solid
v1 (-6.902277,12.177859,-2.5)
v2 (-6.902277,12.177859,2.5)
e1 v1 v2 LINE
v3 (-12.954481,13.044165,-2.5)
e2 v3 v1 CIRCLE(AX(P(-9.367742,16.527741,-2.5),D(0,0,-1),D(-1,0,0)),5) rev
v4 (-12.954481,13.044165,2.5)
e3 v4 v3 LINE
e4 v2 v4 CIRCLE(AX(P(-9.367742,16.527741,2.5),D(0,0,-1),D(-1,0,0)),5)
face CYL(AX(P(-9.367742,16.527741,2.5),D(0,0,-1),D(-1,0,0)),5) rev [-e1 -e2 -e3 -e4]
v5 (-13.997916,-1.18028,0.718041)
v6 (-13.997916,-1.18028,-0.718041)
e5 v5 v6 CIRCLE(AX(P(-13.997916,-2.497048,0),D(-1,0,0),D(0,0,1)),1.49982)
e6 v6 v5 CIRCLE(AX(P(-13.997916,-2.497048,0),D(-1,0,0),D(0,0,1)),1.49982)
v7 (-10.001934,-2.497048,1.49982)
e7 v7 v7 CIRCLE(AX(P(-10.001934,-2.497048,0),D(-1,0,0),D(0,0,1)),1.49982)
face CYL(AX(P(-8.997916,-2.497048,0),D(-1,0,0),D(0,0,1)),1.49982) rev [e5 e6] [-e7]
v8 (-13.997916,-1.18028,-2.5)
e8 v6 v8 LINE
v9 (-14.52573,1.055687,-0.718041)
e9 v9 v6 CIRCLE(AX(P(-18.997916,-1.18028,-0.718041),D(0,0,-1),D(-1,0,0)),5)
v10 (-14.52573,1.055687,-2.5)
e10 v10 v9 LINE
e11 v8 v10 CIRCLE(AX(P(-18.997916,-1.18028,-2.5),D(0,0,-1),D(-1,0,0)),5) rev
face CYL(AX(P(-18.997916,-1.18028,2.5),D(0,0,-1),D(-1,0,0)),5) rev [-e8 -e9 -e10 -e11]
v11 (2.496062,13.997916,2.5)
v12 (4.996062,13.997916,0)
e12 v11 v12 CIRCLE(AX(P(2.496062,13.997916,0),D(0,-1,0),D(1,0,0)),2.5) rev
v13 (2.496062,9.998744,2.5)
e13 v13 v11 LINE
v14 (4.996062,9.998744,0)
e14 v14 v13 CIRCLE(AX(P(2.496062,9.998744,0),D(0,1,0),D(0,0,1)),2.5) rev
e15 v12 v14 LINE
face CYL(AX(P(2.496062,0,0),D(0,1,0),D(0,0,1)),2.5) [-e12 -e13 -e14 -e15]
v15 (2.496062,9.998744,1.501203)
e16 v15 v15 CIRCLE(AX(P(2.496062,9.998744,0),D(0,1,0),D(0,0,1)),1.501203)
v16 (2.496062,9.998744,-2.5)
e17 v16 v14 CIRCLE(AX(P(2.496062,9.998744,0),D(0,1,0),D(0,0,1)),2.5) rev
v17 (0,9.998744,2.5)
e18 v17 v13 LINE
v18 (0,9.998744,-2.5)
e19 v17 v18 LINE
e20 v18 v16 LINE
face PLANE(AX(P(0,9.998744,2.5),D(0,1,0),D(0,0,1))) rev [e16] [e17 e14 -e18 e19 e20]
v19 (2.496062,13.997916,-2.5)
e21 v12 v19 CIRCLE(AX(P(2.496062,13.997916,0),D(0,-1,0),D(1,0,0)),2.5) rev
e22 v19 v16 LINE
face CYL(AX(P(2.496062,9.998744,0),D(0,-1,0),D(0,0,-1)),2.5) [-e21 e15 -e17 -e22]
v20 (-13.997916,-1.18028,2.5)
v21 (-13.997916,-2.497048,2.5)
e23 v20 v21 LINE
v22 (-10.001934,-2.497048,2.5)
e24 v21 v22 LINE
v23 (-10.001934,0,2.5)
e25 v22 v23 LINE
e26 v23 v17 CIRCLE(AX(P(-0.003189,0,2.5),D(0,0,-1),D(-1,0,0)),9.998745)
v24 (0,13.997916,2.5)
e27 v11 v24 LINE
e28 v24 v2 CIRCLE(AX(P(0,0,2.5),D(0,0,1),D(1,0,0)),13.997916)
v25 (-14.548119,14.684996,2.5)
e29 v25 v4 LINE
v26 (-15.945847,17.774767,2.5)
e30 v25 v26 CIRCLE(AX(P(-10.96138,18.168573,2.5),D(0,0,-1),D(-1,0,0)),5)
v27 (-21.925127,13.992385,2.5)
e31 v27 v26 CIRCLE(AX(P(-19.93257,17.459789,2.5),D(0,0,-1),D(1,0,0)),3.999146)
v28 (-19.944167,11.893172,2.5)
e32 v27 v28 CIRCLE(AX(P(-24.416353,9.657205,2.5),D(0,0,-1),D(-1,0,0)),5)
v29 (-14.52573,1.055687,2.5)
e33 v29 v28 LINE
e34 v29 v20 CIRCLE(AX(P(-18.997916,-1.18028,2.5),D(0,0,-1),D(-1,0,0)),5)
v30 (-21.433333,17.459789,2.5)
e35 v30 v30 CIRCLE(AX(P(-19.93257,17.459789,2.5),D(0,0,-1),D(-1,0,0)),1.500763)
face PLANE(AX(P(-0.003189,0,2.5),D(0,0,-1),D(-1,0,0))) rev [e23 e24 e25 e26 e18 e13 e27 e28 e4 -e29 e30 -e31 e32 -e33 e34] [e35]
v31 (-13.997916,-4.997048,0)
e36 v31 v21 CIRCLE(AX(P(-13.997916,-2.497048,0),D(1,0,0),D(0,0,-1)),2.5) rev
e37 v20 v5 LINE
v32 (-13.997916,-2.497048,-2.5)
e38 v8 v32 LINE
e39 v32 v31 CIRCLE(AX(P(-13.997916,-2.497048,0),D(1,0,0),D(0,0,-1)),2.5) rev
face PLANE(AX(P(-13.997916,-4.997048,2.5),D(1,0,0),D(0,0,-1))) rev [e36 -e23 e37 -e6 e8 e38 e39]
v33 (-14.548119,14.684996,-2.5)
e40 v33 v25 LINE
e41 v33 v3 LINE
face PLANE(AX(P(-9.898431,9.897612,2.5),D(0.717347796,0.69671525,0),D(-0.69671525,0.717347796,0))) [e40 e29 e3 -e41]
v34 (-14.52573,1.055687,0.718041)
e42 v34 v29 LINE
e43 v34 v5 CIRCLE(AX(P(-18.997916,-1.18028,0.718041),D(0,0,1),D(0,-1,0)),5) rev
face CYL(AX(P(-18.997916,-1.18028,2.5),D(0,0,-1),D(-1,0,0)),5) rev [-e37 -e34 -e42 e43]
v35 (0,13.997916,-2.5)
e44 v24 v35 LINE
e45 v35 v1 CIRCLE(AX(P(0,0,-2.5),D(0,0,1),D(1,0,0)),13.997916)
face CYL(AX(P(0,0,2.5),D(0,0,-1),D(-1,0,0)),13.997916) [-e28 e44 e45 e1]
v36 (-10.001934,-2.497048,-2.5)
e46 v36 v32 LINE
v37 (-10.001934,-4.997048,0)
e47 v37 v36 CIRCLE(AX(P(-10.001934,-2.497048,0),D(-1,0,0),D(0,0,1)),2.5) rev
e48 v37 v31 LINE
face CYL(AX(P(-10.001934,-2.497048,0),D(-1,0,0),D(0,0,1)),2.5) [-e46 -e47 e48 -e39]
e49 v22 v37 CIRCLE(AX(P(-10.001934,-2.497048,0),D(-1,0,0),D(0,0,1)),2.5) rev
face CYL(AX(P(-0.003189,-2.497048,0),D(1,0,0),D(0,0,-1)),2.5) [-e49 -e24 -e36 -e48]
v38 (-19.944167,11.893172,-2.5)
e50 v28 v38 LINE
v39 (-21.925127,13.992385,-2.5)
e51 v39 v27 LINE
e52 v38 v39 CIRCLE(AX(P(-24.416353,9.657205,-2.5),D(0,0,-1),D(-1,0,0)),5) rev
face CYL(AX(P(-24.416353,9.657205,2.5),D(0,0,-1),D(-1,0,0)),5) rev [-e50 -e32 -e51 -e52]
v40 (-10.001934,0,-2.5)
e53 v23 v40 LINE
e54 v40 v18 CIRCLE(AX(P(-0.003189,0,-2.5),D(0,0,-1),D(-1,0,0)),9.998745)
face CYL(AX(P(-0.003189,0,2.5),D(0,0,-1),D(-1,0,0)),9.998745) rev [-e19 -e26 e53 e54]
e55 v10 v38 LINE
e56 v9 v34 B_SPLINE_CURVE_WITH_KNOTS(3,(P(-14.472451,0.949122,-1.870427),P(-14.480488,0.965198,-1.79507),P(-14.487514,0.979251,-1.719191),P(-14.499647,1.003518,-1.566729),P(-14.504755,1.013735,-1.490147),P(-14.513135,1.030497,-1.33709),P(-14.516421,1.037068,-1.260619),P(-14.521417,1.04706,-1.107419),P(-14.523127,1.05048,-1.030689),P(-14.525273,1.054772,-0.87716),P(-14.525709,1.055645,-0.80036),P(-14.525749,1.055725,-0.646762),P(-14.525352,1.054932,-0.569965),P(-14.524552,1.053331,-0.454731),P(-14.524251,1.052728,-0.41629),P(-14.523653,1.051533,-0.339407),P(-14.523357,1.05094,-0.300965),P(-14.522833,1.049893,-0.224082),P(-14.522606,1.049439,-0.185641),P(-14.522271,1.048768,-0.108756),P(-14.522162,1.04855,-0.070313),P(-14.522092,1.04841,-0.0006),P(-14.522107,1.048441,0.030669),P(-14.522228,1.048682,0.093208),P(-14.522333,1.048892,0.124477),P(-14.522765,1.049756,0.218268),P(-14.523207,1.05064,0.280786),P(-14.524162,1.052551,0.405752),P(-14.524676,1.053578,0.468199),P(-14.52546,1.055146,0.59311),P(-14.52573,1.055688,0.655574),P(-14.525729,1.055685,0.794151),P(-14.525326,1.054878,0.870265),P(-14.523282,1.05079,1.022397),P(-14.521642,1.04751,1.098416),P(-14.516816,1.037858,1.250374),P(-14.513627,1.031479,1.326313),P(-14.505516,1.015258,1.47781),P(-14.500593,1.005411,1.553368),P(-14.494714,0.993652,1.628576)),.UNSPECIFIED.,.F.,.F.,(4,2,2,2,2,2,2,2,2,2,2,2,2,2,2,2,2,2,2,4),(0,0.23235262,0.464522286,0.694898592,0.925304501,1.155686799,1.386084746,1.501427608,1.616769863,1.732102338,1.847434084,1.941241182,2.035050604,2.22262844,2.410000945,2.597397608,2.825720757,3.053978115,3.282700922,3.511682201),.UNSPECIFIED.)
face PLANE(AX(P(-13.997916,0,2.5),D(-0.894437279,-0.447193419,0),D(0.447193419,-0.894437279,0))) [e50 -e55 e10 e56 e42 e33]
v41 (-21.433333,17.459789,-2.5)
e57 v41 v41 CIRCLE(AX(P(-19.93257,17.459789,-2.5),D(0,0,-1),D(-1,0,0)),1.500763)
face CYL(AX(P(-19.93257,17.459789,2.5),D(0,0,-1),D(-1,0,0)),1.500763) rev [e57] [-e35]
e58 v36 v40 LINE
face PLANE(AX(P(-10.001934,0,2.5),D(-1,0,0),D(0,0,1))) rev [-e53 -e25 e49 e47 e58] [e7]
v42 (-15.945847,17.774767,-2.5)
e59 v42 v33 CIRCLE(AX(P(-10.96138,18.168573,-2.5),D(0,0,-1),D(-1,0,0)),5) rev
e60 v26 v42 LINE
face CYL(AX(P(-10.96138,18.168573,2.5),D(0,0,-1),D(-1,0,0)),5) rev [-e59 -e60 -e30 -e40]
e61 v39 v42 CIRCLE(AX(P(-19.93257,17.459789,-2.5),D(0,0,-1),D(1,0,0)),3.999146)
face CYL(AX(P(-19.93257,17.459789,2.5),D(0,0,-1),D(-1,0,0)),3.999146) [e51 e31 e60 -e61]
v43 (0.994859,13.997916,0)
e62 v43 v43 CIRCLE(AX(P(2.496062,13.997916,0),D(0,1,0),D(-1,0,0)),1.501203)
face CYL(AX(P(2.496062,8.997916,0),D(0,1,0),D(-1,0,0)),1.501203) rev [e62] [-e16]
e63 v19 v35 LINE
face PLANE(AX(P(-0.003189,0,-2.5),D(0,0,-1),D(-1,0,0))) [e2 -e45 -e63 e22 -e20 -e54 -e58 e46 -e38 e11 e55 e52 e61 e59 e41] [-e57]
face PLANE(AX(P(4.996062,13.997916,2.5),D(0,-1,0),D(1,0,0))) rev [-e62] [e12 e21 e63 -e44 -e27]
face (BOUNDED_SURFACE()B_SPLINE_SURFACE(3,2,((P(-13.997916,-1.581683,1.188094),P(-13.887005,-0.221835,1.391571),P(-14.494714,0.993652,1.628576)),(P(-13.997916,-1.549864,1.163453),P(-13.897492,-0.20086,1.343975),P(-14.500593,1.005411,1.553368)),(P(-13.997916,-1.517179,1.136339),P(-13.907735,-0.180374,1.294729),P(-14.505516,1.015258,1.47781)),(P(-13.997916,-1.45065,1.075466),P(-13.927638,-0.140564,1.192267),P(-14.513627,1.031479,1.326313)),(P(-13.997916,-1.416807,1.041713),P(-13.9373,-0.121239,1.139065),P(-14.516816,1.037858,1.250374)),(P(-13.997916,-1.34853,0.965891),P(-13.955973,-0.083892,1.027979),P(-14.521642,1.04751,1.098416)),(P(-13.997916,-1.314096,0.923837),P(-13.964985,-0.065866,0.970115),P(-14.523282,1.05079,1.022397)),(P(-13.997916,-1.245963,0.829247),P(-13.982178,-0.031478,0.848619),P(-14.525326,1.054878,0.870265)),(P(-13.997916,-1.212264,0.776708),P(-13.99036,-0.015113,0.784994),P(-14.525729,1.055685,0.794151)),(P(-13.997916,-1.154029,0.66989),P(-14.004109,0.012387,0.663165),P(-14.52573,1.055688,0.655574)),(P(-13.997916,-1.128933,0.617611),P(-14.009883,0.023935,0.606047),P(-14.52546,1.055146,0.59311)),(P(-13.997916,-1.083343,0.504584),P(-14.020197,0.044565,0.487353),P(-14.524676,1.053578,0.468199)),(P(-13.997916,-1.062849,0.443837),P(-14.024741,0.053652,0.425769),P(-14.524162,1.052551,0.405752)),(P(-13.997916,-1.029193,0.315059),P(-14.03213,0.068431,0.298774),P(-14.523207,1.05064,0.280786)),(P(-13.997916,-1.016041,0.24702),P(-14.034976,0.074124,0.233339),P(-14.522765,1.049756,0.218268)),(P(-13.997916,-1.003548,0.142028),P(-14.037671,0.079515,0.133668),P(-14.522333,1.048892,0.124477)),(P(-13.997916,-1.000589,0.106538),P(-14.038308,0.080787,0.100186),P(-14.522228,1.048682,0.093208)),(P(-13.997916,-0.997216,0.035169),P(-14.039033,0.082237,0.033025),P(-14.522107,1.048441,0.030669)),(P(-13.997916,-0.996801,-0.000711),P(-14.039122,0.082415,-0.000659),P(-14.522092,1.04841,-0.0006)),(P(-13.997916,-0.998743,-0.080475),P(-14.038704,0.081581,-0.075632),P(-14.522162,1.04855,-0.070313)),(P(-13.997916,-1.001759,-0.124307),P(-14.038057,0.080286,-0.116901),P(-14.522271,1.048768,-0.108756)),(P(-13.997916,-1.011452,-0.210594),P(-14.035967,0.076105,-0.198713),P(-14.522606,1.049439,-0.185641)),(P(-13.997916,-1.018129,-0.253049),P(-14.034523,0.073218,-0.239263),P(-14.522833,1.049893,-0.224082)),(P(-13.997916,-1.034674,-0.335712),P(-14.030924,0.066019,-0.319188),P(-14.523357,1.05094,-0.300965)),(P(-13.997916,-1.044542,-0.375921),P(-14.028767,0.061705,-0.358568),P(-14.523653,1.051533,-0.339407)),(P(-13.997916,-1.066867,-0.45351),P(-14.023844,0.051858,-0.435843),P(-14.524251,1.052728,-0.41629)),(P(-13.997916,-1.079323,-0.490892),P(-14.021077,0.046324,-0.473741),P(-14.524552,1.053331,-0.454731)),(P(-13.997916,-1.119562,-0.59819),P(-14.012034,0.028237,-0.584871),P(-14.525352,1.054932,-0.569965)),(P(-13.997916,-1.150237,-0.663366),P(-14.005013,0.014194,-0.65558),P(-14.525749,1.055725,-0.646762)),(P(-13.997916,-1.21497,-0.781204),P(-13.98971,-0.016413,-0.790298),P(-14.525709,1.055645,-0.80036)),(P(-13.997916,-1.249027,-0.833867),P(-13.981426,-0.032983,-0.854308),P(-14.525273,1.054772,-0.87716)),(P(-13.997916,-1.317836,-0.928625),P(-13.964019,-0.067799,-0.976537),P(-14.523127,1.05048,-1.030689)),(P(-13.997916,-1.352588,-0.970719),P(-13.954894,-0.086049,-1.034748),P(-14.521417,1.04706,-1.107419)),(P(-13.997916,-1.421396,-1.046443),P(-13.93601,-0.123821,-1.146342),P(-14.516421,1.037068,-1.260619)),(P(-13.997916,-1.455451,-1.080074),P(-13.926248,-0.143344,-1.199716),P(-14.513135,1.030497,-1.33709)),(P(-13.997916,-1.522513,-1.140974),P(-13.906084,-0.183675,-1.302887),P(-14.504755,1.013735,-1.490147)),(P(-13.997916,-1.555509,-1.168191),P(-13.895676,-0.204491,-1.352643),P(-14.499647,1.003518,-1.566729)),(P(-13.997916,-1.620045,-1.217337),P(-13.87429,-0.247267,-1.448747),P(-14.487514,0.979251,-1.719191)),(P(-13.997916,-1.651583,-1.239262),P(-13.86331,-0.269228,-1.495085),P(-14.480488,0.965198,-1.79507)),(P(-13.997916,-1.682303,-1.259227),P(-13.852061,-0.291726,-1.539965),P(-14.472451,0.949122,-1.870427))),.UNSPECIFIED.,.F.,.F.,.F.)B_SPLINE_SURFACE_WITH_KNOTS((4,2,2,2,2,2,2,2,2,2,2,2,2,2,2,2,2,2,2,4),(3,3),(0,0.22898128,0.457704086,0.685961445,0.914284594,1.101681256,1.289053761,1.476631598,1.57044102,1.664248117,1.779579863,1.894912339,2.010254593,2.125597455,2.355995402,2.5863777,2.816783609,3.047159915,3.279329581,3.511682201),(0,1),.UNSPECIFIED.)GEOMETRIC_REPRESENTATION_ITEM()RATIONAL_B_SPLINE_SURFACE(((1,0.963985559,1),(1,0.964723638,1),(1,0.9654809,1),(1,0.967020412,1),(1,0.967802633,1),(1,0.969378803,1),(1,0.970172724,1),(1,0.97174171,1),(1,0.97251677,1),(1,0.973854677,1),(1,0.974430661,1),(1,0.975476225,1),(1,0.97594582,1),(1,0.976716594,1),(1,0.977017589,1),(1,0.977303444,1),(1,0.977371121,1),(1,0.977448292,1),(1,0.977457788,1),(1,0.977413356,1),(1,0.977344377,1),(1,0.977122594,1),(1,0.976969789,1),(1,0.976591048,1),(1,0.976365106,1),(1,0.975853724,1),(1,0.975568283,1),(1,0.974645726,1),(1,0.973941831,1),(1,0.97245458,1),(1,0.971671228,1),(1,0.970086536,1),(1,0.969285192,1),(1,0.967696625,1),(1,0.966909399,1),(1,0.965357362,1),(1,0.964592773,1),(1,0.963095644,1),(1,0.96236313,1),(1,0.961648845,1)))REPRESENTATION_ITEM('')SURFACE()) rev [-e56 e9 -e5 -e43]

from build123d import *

# Parameters (mm, degrees)
EXTRUDE_1_DEPTH     = 2.5
FILLET_1_R          = 2.5
SKETCH_4_R          = 1.501202813
CUT_EXTRUDE_2_DEPTH = 5
SKETCH_5_R          = 1.499820195
CUT_EXTRUDE_3_DEPTH = 5
EXTRUDE_START       = -5
SKETCH_6_R          = 1.500762706
EXTRUDE_2_DEPTH     = 5
FILLET_2_R          = 5


with BuildPart() as part:
    # 草图1 → 凸台-拉伸1 (new, symmetric)
    with BuildSketch(Plane.XY):
        with BuildLine():
            Line((0, 9.998744027), (4.99606171, 9.998744027))
            Line((4.99606171, 9.998744027), (4.99606171, 13.997916296))
            Line((4.99606171, 13.997916296), (0, 13.997916296))
            ThreePointArc((0, 13.997916296), (-9.898021536, 9.898021536), (-13.997916296, 0))
            Line((-13.997916296, 0), (-13.997916296, -4.997048222))
            Line((-13.997916296, -4.997048222), (-10.001933758, -4.997048222))
            Line((-10.001933758, -4.997048222), (-10.001933758, 0))
            ThreePointArc((-10.001933758, 0), (-7.072241637, 7.071307535), (0, 9.998744027))
        make_face()
    extrude(amount=EXTRUDE_1_DEPTH, both=True)

    # 圆角1
    fillet_1_edges = [part.edges().sort_by_distance(p)[0] for p in [
        (-11.999925027, -4.997048222, -2.5),
        (-11.999925027, -4.997048222, 2.5),
        (4.99606171, 11.998330162, -2.5),
        (4.99606171, 11.998330162, 2.5),
    ]]
    fillet(fillet_1_edges, radius=FILLET_1_R - 0.0001)  # a hair under: the kernel refuses the full size

    # 草图4 → 切除-拉伸2 (cut)
    with BuildSketch(Plane(origin=(0, 13.997916296, 0), x_dir=(1, 0, 0), z_dir=(0, 1, 0))):
        with Locations(Location((2.49606171, 0, 0), (0, 0, 180))):
            Circle(SKETCH_4_R)
    extrude(amount=-CUT_EXTRUDE_2_DEPTH, mode=Mode.SUBTRACT)

    # 草图5 → 切除-拉伸3 (cut)
    with BuildSketch(Plane.ZY.offset(13.997916296)):
        with Locations((0, -2.497048222)):
            Circle(SKETCH_5_R)
    extrude(amount=-CUT_EXTRUDE_3_DEPTH, mode=Mode.SUBTRACT)

    # 草图6 → 凸台-拉伸2 (add)
    with BuildSketch(Plane(origin=(0, 0, -2.5), x_dir=(-1, 0, 0), z_dir=(0, 0, -1)).offset(EXTRUDE_START)):
        with BuildLine():
            Line((9.898430706, 9.897612349), (16.10800673, 16.291078939))
            ThreePointArc((16.10800673, 16.291078939), (21.958821842, 20.907611506), (20.772449798, 13.549831148))
            Line((20.772449798, 13.549831148), (13.997916296, 0))
            ThreePointArc((13.997916296, 0), (12.932499084, 5.356503344), (9.898430706, 9.897612349))
        make_face()
        with Locations((19.932570399, 17.459789485)):
            Circle(SKETCH_6_R, mode=Mode.SUBTRACT)
    extrude(amount=EXTRUDE_2_DEPTH)

    # 圆角2
    fillet_2_edges = [part.edges().sort_by_distance(p)[0] for p in [
        (-13.997916296, 0, 0),
        (-9.898430706, 9.897612349, 0),
        (-16.10800673, 16.291078939, 0),
        (-20.772449798, 13.549831148, 0),
    ]]
    fillet(fillet_2_edges, radius=FILLET_2_R)


solid = part.part
